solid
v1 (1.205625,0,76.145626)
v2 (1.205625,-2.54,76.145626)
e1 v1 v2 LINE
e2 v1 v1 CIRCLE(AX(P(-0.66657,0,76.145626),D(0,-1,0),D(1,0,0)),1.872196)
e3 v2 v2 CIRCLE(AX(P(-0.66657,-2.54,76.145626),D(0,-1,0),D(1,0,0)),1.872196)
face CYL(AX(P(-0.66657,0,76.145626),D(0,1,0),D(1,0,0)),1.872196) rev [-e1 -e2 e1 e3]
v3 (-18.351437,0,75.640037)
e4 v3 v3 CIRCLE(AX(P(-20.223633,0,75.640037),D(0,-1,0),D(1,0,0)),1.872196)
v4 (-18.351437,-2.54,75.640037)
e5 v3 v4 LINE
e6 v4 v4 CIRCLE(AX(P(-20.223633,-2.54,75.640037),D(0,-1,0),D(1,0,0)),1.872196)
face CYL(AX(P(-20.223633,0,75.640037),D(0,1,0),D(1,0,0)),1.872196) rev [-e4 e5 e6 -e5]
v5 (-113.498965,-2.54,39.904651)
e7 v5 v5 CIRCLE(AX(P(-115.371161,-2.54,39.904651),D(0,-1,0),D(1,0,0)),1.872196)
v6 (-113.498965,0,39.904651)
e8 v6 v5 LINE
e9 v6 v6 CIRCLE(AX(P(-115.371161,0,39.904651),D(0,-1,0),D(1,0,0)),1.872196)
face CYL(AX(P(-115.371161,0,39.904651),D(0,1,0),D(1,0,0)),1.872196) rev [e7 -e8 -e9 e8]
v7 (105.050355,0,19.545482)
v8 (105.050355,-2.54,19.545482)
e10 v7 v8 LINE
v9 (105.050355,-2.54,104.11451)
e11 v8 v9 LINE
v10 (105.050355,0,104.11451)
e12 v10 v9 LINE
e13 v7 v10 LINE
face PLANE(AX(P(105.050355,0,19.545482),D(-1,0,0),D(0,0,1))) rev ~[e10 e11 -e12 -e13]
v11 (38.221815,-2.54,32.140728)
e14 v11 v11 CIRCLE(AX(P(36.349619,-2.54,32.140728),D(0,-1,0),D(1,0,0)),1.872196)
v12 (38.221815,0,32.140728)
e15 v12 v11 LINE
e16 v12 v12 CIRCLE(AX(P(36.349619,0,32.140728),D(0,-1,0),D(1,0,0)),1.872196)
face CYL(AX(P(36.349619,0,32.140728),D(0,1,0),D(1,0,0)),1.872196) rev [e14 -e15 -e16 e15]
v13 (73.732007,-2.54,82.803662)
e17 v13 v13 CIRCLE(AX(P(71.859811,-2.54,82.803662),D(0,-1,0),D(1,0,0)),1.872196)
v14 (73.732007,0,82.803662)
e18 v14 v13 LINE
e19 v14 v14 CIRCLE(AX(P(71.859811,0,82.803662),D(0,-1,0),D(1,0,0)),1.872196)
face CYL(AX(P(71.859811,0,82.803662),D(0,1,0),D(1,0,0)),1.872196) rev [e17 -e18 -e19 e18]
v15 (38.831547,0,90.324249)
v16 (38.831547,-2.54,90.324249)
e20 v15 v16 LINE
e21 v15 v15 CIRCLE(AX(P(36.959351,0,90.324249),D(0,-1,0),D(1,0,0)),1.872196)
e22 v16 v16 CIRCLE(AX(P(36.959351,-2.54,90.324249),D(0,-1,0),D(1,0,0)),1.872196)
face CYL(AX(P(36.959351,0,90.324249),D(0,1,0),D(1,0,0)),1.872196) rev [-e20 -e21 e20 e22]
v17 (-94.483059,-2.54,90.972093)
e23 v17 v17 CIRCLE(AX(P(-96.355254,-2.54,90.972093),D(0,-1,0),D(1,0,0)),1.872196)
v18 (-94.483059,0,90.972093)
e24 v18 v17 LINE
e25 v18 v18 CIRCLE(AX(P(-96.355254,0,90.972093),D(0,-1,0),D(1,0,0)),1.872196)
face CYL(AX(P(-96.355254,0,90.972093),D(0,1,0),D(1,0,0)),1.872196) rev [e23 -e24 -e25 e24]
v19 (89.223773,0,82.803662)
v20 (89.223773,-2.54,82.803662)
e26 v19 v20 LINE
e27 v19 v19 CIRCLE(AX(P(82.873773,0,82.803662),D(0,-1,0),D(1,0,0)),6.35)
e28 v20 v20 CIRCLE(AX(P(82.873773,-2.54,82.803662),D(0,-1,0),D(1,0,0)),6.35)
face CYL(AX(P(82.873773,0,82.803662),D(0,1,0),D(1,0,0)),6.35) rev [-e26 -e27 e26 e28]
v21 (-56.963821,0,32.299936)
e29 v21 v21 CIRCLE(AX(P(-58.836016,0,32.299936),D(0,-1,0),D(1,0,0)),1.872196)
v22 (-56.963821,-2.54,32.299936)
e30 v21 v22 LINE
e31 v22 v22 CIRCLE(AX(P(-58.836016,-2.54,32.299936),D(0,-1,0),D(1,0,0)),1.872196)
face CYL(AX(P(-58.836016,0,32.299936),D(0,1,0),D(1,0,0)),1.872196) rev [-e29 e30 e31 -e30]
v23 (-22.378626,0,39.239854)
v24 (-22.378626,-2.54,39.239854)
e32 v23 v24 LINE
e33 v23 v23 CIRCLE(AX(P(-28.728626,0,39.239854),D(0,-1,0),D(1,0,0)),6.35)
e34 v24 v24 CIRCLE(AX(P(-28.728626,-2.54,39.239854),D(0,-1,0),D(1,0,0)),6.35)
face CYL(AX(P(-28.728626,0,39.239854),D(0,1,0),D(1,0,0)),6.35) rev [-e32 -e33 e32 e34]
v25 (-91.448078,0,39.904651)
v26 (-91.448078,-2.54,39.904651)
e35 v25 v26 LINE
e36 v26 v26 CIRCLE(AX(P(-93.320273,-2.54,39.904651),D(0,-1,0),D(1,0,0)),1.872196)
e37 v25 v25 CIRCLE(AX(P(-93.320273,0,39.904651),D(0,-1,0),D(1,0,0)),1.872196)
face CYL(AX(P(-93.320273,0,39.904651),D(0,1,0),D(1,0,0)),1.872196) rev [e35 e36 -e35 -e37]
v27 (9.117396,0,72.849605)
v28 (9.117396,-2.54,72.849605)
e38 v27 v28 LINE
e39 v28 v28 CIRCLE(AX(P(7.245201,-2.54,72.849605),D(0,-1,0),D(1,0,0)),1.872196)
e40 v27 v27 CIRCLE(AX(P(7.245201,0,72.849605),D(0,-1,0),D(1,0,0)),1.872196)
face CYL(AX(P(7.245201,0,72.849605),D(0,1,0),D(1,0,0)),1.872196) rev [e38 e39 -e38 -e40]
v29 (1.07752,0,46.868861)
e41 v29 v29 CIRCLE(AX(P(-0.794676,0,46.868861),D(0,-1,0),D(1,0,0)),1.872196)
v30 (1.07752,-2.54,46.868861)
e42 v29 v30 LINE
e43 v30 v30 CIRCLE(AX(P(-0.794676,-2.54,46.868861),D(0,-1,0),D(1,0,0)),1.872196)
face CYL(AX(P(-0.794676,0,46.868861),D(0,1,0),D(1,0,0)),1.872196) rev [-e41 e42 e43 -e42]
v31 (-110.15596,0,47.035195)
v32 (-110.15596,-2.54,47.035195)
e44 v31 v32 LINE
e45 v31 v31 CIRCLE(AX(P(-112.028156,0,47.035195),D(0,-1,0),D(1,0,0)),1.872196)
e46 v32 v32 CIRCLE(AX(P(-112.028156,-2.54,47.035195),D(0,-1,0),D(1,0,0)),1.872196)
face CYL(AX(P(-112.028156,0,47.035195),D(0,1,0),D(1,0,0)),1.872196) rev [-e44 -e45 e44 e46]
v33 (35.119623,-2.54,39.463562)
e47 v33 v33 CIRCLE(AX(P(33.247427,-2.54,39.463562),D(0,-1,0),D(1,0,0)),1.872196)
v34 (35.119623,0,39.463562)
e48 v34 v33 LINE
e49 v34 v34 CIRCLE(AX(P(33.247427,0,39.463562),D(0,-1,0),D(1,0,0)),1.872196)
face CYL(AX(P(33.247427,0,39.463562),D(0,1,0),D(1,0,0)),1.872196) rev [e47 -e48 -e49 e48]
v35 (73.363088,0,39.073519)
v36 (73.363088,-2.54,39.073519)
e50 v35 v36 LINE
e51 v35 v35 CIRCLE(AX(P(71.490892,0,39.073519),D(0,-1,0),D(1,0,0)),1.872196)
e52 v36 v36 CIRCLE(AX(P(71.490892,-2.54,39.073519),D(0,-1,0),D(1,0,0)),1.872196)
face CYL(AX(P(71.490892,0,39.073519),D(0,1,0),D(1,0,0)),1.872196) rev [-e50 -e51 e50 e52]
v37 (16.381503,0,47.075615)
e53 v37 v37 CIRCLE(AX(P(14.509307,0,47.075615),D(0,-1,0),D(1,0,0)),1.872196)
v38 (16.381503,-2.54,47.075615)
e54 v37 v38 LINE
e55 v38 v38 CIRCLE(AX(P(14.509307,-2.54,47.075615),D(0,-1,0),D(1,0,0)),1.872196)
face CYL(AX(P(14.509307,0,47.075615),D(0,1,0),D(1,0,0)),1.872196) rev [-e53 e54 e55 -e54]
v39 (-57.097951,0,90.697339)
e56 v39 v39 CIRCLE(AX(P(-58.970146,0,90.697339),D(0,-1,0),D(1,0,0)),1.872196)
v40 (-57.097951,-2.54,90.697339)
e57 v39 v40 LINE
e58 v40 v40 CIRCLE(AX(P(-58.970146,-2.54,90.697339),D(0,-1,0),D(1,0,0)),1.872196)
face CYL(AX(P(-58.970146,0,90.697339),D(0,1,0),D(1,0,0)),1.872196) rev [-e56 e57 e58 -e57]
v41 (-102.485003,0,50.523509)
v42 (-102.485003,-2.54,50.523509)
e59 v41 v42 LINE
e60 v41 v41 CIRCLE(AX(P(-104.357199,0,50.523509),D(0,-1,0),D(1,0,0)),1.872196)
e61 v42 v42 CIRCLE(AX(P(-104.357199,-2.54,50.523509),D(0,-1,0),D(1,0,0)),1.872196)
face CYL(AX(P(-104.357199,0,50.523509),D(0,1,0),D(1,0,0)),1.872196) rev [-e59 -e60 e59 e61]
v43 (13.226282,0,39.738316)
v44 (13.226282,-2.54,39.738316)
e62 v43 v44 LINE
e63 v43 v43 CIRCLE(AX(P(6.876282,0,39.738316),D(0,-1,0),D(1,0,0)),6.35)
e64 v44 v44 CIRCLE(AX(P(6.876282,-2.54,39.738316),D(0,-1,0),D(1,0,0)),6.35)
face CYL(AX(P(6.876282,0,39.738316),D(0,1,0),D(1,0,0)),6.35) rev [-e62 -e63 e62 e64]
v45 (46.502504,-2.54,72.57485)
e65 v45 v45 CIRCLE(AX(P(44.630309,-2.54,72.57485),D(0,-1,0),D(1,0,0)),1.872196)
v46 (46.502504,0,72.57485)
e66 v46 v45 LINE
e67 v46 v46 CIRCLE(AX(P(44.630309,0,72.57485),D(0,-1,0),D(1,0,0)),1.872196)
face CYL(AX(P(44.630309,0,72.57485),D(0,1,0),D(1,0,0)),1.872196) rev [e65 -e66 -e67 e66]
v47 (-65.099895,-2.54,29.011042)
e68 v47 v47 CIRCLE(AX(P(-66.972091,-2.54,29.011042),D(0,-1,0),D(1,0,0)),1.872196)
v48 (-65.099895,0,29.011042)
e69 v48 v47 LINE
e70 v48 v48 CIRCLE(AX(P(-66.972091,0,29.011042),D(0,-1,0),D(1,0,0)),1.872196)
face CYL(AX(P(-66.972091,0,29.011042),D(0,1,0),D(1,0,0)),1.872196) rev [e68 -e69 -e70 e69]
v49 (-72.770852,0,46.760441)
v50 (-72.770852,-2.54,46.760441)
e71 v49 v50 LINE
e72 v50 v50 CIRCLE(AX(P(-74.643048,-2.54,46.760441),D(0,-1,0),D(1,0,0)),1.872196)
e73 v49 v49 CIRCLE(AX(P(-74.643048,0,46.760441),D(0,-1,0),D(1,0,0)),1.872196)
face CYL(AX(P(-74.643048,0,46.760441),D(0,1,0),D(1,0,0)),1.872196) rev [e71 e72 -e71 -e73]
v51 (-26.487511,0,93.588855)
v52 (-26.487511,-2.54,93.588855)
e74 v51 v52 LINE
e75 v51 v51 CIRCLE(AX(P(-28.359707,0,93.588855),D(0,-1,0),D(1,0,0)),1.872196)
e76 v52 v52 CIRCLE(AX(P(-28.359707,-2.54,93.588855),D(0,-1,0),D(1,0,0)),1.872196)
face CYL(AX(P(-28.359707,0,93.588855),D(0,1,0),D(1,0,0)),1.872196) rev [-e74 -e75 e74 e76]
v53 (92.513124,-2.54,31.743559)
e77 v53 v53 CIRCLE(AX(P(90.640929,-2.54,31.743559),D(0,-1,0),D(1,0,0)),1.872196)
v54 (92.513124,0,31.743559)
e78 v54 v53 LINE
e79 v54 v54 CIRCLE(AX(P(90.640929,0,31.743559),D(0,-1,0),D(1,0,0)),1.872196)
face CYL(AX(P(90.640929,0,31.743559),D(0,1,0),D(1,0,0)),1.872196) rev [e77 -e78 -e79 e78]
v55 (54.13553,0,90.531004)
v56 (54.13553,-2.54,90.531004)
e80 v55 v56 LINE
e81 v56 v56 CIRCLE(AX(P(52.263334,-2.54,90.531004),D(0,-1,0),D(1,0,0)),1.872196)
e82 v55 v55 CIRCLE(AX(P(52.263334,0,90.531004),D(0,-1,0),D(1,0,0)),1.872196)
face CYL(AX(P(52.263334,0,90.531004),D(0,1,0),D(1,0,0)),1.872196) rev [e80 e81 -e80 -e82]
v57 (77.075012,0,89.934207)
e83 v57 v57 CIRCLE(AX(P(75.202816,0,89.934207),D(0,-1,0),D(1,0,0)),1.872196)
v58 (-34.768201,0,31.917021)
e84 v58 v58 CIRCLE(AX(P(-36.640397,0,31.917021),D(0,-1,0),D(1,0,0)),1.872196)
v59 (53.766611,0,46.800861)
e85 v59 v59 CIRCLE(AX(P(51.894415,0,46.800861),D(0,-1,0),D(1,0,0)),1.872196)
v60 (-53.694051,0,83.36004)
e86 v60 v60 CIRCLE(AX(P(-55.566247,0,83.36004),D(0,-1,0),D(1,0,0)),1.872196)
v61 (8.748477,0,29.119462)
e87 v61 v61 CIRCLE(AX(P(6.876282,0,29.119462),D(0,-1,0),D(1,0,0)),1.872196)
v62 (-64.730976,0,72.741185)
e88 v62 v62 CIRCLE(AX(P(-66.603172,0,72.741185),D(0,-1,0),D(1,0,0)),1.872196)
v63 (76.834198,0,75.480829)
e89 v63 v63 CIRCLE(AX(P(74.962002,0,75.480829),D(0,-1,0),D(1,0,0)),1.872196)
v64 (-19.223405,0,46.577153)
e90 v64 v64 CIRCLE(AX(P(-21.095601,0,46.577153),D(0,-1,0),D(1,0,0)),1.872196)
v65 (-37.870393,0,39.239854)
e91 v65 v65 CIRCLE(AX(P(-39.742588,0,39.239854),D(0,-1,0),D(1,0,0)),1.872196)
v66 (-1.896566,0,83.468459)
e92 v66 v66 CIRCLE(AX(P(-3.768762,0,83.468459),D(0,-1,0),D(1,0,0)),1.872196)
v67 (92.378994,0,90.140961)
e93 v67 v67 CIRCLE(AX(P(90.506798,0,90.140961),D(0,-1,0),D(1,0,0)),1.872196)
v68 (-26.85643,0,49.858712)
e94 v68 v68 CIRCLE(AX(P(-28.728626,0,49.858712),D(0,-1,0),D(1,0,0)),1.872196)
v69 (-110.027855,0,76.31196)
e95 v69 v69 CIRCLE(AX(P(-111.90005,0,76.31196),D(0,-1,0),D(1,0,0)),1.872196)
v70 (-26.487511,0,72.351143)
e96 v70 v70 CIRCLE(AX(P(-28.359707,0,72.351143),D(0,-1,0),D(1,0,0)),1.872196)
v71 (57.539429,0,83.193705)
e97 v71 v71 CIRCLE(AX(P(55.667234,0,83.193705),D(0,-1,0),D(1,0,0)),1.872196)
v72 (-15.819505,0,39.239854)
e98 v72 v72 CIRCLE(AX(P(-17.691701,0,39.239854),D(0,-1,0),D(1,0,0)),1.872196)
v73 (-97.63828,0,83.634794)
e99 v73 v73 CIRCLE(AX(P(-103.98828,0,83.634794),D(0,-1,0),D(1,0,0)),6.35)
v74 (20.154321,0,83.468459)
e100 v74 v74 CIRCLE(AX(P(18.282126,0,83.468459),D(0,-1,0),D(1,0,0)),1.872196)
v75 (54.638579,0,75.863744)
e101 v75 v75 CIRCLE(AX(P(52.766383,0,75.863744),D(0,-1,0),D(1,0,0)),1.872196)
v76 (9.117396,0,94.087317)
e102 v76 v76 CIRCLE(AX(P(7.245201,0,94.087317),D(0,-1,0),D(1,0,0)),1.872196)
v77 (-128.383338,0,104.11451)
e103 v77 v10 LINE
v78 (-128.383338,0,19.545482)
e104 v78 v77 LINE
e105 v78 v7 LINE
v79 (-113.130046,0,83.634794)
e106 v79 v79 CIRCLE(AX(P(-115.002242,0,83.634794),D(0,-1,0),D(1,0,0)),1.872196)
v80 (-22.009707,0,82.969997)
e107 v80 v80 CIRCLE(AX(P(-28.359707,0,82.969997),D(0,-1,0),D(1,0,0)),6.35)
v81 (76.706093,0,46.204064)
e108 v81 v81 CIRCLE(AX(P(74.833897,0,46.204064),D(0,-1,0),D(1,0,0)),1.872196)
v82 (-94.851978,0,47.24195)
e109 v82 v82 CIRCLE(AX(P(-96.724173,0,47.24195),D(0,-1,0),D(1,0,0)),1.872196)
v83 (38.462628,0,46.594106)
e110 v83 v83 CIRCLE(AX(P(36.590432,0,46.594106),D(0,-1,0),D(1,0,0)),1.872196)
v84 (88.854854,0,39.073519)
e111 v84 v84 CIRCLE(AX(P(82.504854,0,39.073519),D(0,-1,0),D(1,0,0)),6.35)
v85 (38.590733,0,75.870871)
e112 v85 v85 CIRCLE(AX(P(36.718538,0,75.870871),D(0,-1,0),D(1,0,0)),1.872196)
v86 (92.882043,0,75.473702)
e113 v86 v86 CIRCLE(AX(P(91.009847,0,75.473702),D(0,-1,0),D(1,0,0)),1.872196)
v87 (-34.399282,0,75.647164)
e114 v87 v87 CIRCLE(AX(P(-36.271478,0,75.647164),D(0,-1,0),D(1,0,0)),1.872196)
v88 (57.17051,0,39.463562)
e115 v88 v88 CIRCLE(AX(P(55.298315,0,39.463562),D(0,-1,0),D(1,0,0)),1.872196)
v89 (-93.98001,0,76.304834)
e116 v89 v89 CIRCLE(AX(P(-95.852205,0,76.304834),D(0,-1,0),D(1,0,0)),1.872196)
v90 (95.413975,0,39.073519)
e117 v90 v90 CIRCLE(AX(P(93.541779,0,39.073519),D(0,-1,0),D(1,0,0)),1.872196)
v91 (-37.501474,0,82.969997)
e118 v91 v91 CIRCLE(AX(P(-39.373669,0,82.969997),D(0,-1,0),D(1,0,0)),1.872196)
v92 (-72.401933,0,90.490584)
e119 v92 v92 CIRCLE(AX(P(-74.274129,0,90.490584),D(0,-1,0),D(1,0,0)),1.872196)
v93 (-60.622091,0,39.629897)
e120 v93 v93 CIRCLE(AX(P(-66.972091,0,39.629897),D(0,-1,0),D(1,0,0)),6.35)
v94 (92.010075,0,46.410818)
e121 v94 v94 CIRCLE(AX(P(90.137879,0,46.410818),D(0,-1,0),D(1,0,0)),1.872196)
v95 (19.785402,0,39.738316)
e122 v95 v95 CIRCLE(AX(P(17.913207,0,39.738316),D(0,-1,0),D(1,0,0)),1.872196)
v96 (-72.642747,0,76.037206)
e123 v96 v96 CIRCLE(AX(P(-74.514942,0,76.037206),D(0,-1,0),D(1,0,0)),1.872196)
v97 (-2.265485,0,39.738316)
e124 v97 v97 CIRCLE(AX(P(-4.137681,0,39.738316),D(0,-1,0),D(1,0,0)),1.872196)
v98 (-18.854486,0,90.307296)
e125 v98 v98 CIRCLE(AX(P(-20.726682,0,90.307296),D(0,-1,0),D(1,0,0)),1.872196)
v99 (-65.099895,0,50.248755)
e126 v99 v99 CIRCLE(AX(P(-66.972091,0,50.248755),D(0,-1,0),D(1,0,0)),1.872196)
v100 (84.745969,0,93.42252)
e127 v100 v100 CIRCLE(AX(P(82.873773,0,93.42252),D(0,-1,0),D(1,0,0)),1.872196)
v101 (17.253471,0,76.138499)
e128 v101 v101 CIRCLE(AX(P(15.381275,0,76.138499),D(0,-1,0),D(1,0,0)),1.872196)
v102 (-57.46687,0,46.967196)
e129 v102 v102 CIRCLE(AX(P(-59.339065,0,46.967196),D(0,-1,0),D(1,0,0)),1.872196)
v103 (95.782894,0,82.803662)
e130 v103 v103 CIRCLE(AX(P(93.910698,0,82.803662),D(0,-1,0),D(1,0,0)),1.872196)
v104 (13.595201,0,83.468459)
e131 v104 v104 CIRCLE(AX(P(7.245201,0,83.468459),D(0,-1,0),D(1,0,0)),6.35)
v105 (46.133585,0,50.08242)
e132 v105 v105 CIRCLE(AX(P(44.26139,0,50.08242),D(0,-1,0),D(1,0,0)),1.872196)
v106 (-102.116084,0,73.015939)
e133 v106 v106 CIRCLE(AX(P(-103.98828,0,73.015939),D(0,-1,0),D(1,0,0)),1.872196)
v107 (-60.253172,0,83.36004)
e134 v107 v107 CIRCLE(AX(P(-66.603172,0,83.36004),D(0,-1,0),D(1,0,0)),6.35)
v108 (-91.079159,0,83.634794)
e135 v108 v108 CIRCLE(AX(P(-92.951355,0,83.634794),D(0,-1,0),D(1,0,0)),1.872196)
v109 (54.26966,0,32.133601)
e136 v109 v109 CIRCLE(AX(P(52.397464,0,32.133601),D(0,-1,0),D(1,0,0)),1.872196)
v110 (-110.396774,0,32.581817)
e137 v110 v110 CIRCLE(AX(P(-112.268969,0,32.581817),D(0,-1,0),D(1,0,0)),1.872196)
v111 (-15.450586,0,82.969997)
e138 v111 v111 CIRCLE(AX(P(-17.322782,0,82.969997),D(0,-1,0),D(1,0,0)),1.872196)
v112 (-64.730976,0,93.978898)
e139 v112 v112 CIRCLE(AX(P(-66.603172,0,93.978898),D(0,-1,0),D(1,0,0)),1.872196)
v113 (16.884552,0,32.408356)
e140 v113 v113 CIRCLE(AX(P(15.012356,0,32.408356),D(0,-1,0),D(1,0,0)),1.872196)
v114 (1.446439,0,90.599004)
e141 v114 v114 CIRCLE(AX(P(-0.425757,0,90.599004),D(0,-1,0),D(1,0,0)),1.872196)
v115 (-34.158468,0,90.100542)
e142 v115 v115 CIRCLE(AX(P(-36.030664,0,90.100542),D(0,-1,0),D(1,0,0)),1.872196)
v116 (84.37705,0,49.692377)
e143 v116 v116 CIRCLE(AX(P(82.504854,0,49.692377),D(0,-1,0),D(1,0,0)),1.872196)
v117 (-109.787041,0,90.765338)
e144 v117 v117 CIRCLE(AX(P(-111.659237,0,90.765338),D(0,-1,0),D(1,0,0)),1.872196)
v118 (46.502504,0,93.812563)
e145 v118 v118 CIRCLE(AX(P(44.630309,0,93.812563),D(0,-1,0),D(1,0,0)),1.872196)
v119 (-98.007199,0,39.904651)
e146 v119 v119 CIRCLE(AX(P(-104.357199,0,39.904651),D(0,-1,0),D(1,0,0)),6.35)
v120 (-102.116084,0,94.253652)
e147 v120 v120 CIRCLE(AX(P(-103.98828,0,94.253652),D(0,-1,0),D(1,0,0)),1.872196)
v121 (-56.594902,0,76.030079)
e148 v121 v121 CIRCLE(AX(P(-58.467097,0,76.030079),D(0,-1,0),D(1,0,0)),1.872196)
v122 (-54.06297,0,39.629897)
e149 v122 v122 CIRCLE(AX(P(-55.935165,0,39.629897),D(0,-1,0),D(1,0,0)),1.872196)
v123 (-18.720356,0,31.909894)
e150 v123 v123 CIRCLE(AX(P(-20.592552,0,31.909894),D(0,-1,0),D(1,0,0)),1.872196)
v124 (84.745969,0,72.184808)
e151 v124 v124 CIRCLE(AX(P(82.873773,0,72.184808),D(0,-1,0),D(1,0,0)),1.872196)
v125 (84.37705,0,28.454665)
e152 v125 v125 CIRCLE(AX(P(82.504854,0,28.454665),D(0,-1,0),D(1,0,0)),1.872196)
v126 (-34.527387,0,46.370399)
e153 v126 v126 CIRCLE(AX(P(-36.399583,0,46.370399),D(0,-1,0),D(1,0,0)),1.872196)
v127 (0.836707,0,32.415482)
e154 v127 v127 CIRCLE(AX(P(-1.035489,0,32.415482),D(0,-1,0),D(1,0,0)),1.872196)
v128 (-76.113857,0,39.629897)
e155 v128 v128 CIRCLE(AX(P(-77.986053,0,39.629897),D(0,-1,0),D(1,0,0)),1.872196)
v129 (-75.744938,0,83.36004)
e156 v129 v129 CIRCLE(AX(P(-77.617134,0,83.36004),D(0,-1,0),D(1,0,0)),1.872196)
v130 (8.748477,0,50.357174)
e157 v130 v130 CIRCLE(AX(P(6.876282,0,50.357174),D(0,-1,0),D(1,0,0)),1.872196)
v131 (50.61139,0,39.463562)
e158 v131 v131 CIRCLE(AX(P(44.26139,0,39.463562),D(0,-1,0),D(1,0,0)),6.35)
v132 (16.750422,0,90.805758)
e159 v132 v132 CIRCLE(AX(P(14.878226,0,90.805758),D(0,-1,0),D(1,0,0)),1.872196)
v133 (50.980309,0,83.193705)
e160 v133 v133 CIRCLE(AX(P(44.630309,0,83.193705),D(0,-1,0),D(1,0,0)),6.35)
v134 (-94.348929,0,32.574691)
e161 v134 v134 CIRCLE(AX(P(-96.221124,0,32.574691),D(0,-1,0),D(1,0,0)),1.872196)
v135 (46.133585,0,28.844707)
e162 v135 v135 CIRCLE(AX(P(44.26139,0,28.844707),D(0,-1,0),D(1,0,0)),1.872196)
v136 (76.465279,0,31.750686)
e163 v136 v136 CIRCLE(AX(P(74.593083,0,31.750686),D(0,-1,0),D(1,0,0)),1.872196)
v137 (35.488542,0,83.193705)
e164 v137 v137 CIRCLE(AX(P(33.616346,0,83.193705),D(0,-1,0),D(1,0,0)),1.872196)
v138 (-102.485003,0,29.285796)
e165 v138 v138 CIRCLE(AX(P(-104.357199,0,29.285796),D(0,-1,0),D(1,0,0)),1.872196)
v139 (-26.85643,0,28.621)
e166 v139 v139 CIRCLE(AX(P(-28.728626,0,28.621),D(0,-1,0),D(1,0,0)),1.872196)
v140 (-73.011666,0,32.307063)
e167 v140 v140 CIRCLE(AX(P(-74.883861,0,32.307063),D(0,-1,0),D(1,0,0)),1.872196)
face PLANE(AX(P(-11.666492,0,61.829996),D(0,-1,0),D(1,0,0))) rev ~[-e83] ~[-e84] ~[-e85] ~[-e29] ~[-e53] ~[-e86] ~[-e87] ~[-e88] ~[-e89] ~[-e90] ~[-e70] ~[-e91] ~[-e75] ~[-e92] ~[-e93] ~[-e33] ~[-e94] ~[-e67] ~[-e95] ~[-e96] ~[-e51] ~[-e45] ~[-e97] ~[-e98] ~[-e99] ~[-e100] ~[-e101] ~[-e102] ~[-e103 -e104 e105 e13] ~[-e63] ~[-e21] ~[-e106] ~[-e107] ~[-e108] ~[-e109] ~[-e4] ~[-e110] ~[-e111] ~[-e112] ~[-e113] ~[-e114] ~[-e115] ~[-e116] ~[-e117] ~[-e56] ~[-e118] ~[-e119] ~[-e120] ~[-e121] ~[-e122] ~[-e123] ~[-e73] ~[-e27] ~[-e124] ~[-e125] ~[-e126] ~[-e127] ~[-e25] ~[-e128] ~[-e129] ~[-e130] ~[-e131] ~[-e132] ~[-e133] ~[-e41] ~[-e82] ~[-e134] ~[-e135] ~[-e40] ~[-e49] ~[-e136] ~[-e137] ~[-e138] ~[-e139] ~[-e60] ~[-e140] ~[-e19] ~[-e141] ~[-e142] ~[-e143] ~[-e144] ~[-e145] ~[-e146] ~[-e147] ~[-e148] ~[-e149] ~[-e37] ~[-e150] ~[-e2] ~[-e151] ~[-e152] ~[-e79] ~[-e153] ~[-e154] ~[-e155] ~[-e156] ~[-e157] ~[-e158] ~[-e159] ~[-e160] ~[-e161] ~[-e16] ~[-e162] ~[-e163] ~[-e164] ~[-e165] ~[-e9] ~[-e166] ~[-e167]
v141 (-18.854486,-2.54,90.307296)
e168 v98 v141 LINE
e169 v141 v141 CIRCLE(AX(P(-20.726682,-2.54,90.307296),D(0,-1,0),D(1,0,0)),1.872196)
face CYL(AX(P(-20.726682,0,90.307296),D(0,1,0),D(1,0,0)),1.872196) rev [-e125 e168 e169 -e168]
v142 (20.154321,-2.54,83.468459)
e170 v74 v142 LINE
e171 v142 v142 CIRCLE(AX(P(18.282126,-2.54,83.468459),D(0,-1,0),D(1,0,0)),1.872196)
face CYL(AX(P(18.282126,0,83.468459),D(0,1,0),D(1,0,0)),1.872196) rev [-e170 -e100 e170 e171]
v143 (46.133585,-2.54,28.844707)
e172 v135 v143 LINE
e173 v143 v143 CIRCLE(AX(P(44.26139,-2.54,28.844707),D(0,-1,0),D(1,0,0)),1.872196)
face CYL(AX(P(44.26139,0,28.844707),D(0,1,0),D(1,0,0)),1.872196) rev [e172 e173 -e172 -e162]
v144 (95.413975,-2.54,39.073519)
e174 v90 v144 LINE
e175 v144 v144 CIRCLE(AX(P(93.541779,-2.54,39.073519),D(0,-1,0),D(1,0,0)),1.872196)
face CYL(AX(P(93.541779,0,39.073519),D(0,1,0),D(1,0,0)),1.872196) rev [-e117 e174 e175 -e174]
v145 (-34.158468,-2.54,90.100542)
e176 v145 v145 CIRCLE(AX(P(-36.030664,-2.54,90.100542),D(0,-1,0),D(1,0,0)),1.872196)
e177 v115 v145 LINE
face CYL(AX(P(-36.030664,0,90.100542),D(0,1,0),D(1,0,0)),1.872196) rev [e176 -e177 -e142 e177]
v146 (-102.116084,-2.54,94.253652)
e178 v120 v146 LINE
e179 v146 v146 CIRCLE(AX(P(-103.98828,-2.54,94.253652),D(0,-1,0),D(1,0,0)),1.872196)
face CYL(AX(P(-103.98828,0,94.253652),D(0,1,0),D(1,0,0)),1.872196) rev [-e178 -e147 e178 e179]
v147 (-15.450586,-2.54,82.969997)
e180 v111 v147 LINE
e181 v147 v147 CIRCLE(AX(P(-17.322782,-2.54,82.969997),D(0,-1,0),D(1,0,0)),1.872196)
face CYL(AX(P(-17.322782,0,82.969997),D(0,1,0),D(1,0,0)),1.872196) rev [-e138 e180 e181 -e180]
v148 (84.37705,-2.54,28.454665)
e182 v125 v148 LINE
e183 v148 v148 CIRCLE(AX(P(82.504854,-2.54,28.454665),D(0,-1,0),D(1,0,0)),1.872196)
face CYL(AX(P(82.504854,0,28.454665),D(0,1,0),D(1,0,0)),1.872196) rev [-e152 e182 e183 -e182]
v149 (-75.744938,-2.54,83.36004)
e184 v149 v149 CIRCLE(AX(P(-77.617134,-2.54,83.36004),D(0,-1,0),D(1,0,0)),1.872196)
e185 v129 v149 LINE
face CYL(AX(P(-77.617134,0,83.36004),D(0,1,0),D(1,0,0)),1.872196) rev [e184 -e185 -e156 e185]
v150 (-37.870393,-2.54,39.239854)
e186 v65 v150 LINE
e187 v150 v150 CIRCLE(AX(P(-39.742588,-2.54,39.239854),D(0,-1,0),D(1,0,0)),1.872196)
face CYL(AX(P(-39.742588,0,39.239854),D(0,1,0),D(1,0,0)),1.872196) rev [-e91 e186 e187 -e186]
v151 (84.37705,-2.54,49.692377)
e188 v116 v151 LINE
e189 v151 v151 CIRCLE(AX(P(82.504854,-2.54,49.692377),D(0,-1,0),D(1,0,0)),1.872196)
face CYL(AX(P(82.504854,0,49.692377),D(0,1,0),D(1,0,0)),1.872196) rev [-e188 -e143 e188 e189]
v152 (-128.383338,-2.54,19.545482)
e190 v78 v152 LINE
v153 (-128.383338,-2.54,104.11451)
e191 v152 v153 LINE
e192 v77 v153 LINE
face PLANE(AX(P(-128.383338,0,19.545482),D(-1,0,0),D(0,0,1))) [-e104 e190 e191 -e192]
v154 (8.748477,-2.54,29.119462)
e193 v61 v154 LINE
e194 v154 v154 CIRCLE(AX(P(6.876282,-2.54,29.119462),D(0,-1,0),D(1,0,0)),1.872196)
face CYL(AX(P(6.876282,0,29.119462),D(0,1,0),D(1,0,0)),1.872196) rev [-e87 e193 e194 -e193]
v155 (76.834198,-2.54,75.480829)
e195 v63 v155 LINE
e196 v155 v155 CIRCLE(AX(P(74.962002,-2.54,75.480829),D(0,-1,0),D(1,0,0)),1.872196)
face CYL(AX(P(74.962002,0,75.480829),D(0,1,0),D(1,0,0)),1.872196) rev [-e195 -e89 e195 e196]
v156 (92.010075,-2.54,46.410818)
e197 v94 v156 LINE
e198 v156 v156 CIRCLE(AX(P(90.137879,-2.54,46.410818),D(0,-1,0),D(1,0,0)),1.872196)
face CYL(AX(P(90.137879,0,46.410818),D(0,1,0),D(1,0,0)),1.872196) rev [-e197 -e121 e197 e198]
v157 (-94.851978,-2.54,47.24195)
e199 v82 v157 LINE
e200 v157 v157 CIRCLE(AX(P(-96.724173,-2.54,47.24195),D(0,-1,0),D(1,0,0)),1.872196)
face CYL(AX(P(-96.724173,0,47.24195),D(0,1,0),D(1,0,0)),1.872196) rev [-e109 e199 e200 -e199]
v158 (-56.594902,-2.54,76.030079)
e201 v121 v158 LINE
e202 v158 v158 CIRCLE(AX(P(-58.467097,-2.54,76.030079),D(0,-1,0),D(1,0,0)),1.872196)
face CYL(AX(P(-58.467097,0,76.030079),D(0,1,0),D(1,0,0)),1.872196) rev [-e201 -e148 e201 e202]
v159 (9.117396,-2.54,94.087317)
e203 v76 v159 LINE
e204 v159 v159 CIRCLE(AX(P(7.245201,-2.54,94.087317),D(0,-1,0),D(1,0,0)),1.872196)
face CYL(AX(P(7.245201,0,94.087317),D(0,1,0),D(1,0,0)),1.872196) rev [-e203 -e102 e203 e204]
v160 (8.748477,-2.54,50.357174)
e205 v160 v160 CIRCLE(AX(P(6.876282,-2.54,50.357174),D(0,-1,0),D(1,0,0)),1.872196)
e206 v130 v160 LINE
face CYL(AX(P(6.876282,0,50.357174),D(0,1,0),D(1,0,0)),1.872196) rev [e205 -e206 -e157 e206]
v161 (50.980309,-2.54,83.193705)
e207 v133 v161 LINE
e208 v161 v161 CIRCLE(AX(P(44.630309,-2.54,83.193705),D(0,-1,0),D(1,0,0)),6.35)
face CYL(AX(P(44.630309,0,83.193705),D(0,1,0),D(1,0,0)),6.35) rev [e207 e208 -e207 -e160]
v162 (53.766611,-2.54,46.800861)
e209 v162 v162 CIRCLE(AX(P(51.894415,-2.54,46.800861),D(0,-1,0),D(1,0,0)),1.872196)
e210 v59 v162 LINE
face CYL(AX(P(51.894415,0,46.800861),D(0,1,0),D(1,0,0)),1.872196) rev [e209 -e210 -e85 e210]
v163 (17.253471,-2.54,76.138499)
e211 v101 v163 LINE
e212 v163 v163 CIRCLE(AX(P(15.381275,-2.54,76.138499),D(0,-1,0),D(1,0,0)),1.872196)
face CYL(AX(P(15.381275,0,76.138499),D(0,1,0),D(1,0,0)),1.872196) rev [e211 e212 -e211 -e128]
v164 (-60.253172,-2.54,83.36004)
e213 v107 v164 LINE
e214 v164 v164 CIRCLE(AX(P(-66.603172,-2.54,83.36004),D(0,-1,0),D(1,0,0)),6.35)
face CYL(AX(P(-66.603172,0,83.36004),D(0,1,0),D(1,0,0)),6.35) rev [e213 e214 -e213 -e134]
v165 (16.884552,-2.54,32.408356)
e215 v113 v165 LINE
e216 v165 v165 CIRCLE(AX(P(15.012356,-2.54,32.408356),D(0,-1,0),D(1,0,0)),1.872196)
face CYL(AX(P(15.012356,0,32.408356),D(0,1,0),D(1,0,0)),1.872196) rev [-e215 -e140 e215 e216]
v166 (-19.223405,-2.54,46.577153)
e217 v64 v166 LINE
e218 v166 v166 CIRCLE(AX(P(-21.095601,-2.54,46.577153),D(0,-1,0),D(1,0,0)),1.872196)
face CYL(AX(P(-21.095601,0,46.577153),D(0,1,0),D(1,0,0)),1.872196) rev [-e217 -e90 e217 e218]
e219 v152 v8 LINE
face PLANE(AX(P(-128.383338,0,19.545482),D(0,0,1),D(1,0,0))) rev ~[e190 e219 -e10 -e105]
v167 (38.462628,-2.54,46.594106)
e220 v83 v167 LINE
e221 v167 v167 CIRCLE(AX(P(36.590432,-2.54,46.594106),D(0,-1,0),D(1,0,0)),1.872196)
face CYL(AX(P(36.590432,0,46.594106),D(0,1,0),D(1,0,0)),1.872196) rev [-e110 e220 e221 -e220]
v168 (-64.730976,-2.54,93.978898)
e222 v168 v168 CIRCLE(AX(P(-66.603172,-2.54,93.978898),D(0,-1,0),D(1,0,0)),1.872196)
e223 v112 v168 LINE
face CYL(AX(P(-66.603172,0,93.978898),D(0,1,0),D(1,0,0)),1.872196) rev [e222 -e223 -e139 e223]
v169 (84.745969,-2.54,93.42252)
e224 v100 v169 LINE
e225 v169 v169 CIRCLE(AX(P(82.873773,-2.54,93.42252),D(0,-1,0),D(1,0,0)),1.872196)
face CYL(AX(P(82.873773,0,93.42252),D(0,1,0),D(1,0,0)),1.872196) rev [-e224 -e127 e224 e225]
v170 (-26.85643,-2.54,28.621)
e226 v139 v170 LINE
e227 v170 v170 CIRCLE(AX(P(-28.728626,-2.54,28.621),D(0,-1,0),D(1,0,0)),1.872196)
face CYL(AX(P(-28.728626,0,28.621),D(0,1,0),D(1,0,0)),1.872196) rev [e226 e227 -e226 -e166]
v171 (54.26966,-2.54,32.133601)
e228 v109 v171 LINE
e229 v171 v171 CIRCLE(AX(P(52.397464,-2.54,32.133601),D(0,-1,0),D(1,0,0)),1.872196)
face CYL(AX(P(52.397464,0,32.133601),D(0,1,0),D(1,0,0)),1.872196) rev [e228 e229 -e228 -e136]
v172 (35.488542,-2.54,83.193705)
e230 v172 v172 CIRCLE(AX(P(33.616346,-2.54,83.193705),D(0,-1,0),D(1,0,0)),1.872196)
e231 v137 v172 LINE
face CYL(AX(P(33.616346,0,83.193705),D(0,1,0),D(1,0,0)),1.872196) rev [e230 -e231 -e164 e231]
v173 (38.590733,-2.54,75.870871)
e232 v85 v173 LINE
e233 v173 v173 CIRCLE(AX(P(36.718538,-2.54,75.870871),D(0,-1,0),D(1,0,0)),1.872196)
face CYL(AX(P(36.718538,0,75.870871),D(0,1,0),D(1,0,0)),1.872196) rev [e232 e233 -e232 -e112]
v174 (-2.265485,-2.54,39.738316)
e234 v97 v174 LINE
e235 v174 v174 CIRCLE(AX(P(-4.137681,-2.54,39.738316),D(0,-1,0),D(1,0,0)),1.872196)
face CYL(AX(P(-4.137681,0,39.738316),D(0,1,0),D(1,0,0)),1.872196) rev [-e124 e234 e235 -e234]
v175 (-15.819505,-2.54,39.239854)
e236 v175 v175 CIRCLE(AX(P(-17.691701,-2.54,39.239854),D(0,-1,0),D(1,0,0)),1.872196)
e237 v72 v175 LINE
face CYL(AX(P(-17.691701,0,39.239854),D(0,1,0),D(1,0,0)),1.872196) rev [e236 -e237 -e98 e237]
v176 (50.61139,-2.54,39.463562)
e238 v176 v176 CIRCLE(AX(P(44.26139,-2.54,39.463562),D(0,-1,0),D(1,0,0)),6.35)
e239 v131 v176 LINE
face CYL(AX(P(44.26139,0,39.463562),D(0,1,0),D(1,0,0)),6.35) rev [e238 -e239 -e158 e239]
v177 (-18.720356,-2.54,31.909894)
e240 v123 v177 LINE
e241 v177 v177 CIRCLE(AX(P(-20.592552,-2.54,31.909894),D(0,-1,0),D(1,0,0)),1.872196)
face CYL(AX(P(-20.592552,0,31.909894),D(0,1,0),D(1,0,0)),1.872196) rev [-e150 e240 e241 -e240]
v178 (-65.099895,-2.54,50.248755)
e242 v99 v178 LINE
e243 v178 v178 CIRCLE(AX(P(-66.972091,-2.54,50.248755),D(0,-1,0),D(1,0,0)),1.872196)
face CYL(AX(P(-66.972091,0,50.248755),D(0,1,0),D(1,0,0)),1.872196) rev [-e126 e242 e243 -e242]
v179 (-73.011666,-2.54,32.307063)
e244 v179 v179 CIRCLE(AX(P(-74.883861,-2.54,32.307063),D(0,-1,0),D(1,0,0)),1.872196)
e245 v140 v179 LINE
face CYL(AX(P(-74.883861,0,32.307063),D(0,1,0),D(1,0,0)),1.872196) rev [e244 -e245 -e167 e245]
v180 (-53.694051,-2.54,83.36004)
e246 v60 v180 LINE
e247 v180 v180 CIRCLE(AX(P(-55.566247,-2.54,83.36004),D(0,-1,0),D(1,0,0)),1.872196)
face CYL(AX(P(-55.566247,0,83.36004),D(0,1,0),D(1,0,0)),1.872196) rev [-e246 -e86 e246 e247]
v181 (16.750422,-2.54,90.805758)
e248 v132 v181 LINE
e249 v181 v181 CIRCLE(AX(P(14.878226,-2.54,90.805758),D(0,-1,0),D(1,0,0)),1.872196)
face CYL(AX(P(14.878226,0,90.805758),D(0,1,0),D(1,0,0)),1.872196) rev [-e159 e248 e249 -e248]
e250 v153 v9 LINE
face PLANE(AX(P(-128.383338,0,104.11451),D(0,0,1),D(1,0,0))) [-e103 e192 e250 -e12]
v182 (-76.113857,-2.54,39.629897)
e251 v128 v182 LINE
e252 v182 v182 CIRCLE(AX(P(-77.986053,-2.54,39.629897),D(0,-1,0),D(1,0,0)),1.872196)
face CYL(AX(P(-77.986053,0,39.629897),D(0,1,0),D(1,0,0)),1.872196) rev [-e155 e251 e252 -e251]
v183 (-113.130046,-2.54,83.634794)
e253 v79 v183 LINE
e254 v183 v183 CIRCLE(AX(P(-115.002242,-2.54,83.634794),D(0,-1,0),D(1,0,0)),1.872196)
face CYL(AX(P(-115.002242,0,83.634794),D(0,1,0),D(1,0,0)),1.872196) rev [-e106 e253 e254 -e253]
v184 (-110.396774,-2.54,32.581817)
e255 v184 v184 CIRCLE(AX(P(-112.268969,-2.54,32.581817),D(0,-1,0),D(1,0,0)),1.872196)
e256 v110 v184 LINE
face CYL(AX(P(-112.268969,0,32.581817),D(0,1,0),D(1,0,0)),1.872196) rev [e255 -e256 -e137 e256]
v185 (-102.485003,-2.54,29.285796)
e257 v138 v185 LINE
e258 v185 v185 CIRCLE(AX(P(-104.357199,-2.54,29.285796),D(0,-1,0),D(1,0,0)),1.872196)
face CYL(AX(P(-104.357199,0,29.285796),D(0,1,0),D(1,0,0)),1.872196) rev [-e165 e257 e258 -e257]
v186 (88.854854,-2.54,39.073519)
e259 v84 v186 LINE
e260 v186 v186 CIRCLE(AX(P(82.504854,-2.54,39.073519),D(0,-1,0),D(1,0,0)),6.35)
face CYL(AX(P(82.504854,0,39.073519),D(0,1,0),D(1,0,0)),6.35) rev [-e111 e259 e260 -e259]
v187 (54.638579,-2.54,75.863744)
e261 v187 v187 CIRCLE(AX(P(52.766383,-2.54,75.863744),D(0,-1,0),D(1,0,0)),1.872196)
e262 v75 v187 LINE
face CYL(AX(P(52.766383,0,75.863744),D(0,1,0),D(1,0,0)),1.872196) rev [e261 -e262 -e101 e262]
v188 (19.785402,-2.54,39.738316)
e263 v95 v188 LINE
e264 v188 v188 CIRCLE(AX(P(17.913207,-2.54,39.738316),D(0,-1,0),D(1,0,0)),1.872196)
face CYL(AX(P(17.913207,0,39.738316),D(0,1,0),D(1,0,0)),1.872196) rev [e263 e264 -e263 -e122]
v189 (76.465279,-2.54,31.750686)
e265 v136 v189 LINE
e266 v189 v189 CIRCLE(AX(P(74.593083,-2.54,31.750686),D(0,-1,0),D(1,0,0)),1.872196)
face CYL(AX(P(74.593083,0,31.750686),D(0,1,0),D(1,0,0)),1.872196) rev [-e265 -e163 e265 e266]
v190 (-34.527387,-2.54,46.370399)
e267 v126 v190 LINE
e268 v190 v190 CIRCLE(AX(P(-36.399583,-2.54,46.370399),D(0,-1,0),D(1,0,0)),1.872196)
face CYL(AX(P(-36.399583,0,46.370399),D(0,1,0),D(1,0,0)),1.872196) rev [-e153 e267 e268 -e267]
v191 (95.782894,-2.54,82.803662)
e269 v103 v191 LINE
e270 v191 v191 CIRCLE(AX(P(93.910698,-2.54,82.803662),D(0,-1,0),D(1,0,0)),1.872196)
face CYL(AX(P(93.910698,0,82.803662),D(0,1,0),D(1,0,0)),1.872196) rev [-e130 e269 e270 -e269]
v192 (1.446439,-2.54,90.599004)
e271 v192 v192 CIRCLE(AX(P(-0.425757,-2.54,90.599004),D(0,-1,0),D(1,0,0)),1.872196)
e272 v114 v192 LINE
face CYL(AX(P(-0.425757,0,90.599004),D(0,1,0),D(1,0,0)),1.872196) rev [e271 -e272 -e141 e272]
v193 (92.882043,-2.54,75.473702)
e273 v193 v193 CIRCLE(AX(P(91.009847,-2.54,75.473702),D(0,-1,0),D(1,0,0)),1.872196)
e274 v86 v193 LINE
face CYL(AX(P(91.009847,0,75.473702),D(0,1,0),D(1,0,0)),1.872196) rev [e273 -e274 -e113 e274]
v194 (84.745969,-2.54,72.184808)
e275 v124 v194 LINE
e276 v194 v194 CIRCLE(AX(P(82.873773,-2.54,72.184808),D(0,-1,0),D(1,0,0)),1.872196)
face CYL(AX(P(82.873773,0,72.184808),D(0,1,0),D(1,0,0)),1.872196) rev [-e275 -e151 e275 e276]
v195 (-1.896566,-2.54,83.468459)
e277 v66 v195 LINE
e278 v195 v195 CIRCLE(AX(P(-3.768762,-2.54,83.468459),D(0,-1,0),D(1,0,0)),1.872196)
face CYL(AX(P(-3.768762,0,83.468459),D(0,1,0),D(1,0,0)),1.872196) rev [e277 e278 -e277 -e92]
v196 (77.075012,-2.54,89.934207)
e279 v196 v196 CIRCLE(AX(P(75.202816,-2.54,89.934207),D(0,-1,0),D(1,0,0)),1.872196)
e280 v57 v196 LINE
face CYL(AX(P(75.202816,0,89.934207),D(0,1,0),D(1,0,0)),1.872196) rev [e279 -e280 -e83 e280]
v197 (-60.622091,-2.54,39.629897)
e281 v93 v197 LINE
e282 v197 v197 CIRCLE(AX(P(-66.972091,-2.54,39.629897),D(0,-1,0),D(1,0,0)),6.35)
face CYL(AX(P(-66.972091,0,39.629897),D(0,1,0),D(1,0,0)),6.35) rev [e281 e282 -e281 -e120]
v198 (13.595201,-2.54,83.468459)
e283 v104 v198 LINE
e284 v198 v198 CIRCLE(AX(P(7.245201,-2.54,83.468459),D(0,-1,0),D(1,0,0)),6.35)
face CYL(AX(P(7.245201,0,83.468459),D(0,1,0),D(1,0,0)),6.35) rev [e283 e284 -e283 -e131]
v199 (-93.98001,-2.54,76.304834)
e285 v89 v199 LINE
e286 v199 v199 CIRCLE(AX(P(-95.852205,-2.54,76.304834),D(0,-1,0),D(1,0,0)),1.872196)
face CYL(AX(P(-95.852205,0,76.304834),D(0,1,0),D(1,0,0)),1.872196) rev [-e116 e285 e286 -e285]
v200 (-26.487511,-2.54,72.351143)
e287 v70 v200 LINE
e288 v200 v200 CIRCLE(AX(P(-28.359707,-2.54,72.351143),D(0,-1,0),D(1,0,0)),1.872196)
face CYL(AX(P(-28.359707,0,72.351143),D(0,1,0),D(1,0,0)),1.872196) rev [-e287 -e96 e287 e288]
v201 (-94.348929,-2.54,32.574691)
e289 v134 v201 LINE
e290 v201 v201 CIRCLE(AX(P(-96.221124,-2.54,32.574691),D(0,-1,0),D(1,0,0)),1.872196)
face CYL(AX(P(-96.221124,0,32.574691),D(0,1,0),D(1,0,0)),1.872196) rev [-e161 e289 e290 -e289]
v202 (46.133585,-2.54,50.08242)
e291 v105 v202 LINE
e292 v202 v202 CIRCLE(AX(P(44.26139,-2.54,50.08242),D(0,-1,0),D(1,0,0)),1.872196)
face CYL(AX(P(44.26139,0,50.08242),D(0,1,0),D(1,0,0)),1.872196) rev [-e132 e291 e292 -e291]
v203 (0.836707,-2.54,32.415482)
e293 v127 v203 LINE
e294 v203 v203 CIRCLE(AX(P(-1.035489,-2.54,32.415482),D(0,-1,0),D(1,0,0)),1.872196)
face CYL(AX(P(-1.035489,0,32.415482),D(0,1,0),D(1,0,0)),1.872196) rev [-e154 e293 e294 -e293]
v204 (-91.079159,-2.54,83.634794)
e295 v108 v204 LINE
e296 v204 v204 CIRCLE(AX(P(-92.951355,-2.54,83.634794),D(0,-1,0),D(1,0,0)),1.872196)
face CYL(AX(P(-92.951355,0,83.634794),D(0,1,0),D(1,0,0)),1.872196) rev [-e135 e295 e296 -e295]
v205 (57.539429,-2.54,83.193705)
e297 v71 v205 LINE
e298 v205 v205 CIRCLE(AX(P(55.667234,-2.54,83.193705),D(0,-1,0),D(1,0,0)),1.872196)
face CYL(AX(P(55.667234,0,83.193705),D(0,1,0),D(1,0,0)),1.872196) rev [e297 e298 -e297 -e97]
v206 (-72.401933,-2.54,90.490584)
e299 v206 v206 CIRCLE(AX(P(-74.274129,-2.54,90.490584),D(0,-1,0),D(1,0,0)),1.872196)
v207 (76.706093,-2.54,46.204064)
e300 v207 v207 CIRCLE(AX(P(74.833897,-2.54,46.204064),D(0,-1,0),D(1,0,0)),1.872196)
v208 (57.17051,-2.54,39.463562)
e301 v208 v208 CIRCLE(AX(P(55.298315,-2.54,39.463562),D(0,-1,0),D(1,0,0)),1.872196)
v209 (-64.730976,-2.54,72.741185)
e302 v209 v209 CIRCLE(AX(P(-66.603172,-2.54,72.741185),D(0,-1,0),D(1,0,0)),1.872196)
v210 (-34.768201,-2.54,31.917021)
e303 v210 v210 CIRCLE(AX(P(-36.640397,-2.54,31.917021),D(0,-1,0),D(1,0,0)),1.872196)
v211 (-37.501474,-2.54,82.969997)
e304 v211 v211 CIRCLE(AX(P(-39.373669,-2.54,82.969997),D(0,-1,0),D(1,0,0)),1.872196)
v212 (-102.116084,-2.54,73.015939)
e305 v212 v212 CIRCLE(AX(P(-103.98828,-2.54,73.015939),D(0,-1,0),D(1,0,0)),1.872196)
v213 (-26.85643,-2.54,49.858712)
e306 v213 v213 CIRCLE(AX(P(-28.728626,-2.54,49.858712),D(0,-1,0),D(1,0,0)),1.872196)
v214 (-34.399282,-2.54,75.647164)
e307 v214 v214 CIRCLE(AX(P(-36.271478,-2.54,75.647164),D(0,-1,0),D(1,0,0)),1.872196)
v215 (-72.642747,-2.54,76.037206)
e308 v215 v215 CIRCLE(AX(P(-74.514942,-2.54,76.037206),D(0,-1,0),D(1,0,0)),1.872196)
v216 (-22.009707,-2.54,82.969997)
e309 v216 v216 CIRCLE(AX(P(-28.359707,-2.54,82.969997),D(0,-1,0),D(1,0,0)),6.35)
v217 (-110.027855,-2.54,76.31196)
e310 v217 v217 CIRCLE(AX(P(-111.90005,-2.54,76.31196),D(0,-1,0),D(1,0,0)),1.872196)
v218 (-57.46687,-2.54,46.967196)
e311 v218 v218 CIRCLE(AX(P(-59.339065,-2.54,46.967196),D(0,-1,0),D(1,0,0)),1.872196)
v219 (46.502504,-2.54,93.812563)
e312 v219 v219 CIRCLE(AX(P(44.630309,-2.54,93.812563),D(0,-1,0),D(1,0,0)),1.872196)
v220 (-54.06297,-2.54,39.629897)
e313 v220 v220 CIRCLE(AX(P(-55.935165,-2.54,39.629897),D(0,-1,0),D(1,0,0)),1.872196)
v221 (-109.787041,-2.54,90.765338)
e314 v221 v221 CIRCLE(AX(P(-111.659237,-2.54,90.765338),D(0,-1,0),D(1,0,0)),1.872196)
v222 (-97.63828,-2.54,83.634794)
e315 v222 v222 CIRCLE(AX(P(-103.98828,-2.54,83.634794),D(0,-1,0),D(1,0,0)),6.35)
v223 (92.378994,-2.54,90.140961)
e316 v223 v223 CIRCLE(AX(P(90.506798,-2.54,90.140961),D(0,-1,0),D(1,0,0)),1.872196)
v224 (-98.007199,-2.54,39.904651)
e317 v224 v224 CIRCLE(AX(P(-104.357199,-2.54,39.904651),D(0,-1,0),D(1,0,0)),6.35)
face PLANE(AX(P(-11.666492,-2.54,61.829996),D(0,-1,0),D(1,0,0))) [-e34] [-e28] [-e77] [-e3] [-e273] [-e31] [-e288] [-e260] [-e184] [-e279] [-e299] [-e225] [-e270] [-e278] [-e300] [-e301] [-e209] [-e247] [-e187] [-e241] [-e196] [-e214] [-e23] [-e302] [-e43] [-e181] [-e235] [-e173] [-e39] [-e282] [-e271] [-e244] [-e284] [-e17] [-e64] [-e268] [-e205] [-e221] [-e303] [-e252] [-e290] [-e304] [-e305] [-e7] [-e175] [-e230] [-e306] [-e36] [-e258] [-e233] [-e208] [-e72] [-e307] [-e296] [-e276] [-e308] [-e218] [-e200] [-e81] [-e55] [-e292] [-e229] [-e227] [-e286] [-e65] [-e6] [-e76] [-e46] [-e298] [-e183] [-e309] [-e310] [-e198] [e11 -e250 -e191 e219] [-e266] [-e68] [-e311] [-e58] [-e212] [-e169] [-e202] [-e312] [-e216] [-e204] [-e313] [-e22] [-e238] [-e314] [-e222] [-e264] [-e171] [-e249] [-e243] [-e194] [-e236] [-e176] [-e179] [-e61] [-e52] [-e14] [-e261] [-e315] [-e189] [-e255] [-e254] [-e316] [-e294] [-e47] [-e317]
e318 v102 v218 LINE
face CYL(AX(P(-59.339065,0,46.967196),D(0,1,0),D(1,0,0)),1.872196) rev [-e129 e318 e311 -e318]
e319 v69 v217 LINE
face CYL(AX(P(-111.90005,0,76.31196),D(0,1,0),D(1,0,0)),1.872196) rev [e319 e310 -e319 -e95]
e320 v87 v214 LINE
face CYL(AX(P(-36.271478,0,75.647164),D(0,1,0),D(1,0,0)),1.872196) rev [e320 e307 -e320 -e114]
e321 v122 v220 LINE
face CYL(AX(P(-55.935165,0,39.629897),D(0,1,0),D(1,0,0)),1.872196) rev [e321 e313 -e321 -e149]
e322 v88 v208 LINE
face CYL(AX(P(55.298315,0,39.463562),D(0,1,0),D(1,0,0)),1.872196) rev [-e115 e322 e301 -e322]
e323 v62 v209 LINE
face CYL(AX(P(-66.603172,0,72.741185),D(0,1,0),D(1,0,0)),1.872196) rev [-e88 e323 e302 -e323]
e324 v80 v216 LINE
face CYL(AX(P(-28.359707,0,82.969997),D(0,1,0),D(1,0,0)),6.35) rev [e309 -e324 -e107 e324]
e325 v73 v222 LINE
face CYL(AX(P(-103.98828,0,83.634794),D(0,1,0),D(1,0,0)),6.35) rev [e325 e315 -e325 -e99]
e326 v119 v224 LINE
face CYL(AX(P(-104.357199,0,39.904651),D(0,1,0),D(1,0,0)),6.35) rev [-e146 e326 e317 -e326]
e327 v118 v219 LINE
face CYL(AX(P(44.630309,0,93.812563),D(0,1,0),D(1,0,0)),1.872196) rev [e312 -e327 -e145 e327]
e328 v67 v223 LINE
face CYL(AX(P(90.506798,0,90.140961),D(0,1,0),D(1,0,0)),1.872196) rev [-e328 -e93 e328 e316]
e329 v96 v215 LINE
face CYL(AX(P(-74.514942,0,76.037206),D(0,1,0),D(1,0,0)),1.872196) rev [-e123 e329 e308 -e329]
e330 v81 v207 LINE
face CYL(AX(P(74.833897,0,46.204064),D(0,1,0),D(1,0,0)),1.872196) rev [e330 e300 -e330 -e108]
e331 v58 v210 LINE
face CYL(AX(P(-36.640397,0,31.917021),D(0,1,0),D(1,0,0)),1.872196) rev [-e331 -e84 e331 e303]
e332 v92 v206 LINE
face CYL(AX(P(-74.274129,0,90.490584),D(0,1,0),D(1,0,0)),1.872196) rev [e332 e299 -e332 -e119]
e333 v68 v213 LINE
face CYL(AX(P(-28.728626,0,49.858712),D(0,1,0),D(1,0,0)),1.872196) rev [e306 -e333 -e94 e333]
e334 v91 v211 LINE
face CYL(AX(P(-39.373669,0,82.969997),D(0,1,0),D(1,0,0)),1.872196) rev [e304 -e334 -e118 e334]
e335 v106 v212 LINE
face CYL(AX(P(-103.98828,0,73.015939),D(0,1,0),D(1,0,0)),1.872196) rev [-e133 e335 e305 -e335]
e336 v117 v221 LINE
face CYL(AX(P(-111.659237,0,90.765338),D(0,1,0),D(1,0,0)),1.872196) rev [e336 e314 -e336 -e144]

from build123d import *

# Parameters (mm, degrees)
F0_W     = 233.4336936474
F0_H     = 84.5690276474
F0_R     = 1.8721957215
F0_R_2   = 6.35
F1_DEPTH = 2.54


# Not quite as in the source:
# - a feature names something its author has since deleted; it is built from what else it names


with BuildPart() as f1:
    # F0 (on Front) → F1 (new body)
    with BuildSketch(Plane.XZ):
        with Locations((-11.6664916277, 61.8299962953)):
            Rectangle(F0_W, F0_H)
        with Locations((-104.3571985153, 29.2857964082)):
            Circle(F0_R, mode=Mode.SUBTRACT)
        with Locations((-112.2689694166, 32.5818173587)):
            Circle(F0_R, mode=Mode.SUBTRACT)
        with Locations((-115.3711608437, 39.9046507223)):
            Circle(F0_R, mode=Mode.SUBTRACT)
        with Locations((-104.3571985153, 39.9046507223)):
            Circle(F0_R_2, mode=Mode.SUBTRACT)
        with Locations((-96.2211242398, 32.574690507)):
            Circle(F0_R, mode=Mode.SUBTRACT)
        with Locations((-74.883861413, 32.3070631458)):
            Circle(F0_R, mode=Mode.SUBTRACT)
        with Locations((-93.3202734975, 39.9046507223)):
            Circle(F0_R, mode=Mode.SUBTRACT)
        with Locations((-77.9860528401, 39.6298965093)):
            Circle(F0_R, mode=Mode.SUBTRACT)
        with Locations((-66.9720905117, 29.0110421952)):
            Circle(F0_R, mode=Mode.SUBTRACT)
        with Locations((-28.7286259285, 28.620999728)):
            Circle(F0_R, mode=Mode.SUBTRACT)
        with Locations((-58.8360162362, 32.299936294)):
            Circle(F0_R, mode=Mode.SUBTRACT)
        with Locations((-66.9720905117, 39.6298965093)):
            Circle(F0_R_2, mode=Mode.SUBTRACT)
        with Locations((-55.9351654939, 39.6298965093)):
            Circle(F0_R, mode=Mode.SUBTRACT)
        with Locations((-36.6403968299, 31.9170206785)):
            Circle(F0_R, mode=Mode.SUBTRACT)
        with Locations((-20.5925516531, 31.9098938268)):
            Circle(F0_R, mode=Mode.SUBTRACT)
        with Locations((-39.742588257, 39.2398540421)):
            Circle(F0_R, mode=Mode.SUBTRACT)
        with Locations((-28.7286259285, 39.2398540421)):
            Circle(F0_R_2, mode=Mode.SUBTRACT)
        with Locations((-17.6917009107, 39.2398540421)):
            Circle(F0_R, mode=Mode.SUBTRACT)
        with Locations((-112.0281557075, 47.0351953909)):
            Circle(F0_R, mode=Mode.SUBTRACT)
        with Locations((-104.3571985153, 50.5235087617)):
            Circle(F0_R, mode=Mode.SUBTRACT)
        with Locations((-96.7241733432, 47.2419499663)):
            Circle(F0_R, mode=Mode.SUBTRACT)
        with Locations((-74.6430477039, 46.7604411779)):
            Circle(F0_R, mode=Mode.SUBTRACT)
        with Locations((-59.3390653396, 46.9671957533)):
            Circle(F0_R, mode=Mode.SUBTRACT)
        with Locations((-66.9720905117, 50.2487545487)):
            Circle(F0_R, mode=Mode.SUBTRACT)
        with Locations((-36.3995831207, 46.3703987107)):
            Circle(F0_R, mode=Mode.SUBTRACT)
        with Locations((-28.7286259285, 49.8587120814)):
            Circle(F0_R, mode=Mode.SUBTRACT)
        with Locations((-21.0956007565, 46.5771532861)):
            Circle(F0_R, mode=Mode.SUBTRACT)
        with Locations((6.8762816883, 29.1194615197)):
            Circle(F0_R, mode=Mode.SUBTRACT)
        with Locations((44.2613896919, 28.8447073068)):
            Circle(F0_R, mode=Mode.SUBTRACT)
        with Locations((-1.035489213, 32.4154824703)):
            Circle(F0_R, mode=Mode.SUBTRACT)
        with Locations((15.0123559638, 32.4083556185)):
            Circle(F0_R, mode=Mode.SUBTRACT)
        with Locations((-4.1376806401, 39.7383158338)):
            Circle(F0_R, mode=Mode.SUBTRACT)
        with Locations((6.8762816883, 39.7383158338)):
            Circle(F0_R_2, mode=Mode.SUBTRACT)
        with Locations((36.3496187906, 32.1407282573)):
            Circle(F0_R, mode=Mode.SUBTRACT)
        with Locations((17.9132067062, 39.7383158338)):
            Circle(F0_R, mode=Mode.SUBTRACT)
        with Locations((33.2474273635, 39.4635616208)):
            Circle(F0_R, mode=Mode.SUBTRACT)
        with Locations((44.2613896919, 39.4635616208)):
            Circle(F0_R_2, mode=Mode.SUBTRACT)
        with Locations((82.5048542751, 28.4546648395)):
            Circle(F0_R, mode=Mode.SUBTRACT)
        with Locations((52.3974639674, 32.1336014056)):
            Circle(F0_R, mode=Mode.SUBTRACT)
        with Locations((74.5930833738, 31.7506857901)):
            Circle(F0_R, mode=Mode.SUBTRACT)
        with Locations((55.2983147098, 39.4635616208)):
            Circle(F0_R, mode=Mode.SUBTRACT)
        with Locations((71.4908919467, 39.0735191536)):
            Circle(F0_R, mode=Mode.SUBTRACT)
        with Locations((90.6409285506, 31.7435589383)):
            Circle(F0_R, mode=Mode.SUBTRACT)
        with Locations((82.5048542751, 39.0735191536)):
            Circle(F0_R_2, mode=Mode.SUBTRACT)
        with Locations((93.5417792929, 39.0735191536)):
            Circle(F0_R, mode=Mode.SUBTRACT)
        with Locations((-0.7946755039, 46.8688605024)):
            Circle(F0_R, mode=Mode.SUBTRACT)
        with Locations((14.5093068604, 47.0756150778)):
            Circle(F0_R, mode=Mode.SUBTRACT)
        with Locations((6.8762816883, 50.3571738732)):
            Circle(F0_R, mode=Mode.SUBTRACT)
        with Locations((36.5904324997, 46.5941062895)):
            Circle(F0_R, mode=Mode.SUBTRACT)
        with Locations((44.2613896919, 50.0824196602)):
            Circle(F0_R, mode=Mode.SUBTRACT)
        with Locations((51.894414864, 46.8008608649)):
            Circle(F0_R, mode=Mode.SUBTRACT)
        with Locations((74.8338970829, 46.2040638222)):
            Circle(F0_R, mode=Mode.SUBTRACT)
        with Locations((90.1378794472, 46.4108183976)):
            Circle(F0_R, mode=Mode.SUBTRACT)
        with Locations((82.5048542751, 49.692377193)):
            Circle(F0_R, mode=Mode.SUBTRACT)
        with Locations((-103.9882795885, 73.0159394443)):
            Circle(F0_R, mode=Mode.SUBTRACT)
        with Locations((-111.9000504898, 76.3119603949)):
            Circle(F0_R, mode=Mode.SUBTRACT)
        with Locations((-95.852205313, 76.3048335431)):
            Circle(F0_R, mode=Mode.SUBTRACT)
        with Locations((-74.5149424862, 76.0372061819)):
            Circle(F0_R, mode=Mode.SUBTRACT)
        with Locations((-28.3597070018, 72.3511427641)):
            Circle(F0_R, mode=Mode.SUBTRACT)
        with Locations((-66.6031715849, 72.7411852313)):
            Circle(F0_R, mode=Mode.SUBTRACT)
        with Locations((-58.4670973094, 76.0300793301)):
            Circle(F0_R, mode=Mode.SUBTRACT)
        with Locations((-36.2714779031, 75.6471637146)):
            Circle(F0_R, mode=Mode.SUBTRACT)
        with Locations((-20.2236327263, 75.6400368629)):
            Circle(F0_R, mode=Mode.SUBTRACT)
        with Locations((-39.3736693302, 82.9699970782)):
            Circle(F0_R, mode=Mode.SUBTRACT)
        with Locations((-28.3597070018, 82.9699970782)):
            Circle(F0_R_2, mode=Mode.SUBTRACT)
        with Locations((-17.3227819839, 82.9699970782)):
            Circle(F0_R, mode=Mode.SUBTRACT)
        with Locations((-115.002241917, 83.6347937584)):
            Circle(F0_R, mode=Mode.SUBTRACT)
        with Locations((-103.9882795885, 83.6347937584)):
            Circle(F0_R_2, mode=Mode.SUBTRACT)
        with Locations((-111.6592367807, 90.765338427)):
            Circle(F0_R, mode=Mode.SUBTRACT)
        with Locations((-92.9513545707, 83.6347937584)):
            Circle(F0_R, mode=Mode.SUBTRACT)
        with Locations((-77.6171339134, 83.3600395454)):
            Circle(F0_R, mode=Mode.SUBTRACT)
        with Locations((-96.3552544164, 90.9720930024)):
            Circle(F0_R, mode=Mode.SUBTRACT)
        with Locations((-74.2741287771, 90.490584214)):
            Circle(F0_R, mode=Mode.SUBTRACT)
        with Locations((-103.9882795885, 94.2536517978)):
            Circle(F0_R, mode=Mode.SUBTRACT)
        with Locations((-66.6031715849, 83.3600395454)):
            Circle(F0_R_2, mode=Mode.SUBTRACT)
        with Locations((-55.5662465671, 83.3600395454)):
            Circle(F0_R, mode=Mode.SUBTRACT)
        with Locations((-58.9701464129, 90.6973387894)):
            Circle(F0_R, mode=Mode.SUBTRACT)
        with Locations((-36.030664194, 90.1005417468)):
            Circle(F0_R, mode=Mode.SUBTRACT)
        with Locations((-20.7266818297, 90.3072963222)):
            Circle(F0_R, mode=Mode.SUBTRACT)
        with Locations((-66.6031715849, 93.9788975848)):
            Circle(F0_R, mode=Mode.SUBTRACT)
        with Locations((-28.3597070018, 93.5888551176)):
            Circle(F0_R, mode=Mode.SUBTRACT)
        with Locations((-0.6665702862, 76.1456255064)):
            Circle(F0_R, mode=Mode.SUBTRACT)
        with Locations((7.2452006151, 72.8496045558)):
            Circle(F0_R, mode=Mode.SUBTRACT)
        with Locations((15.3812748906, 76.1384986547)):
            Circle(F0_R, mode=Mode.SUBTRACT)
        with Locations((44.6303086187, 72.5748503429)):
            Circle(F0_R, mode=Mode.SUBTRACT)
        with Locations((36.7185377174, 75.8708712934)):
            Circle(F0_R, mode=Mode.SUBTRACT)
        with Locations((82.8737732019, 72.1848078756)):
            Circle(F0_R, mode=Mode.SUBTRACT)
        with Locations((52.7663828942, 75.8637444417)):
            Circle(F0_R, mode=Mode.SUBTRACT)
        with Locations((74.9620023005, 75.4808288262)):
            Circle(F0_R, mode=Mode.SUBTRACT)
        with Locations((71.8598108734, 82.8036621897)):
            Circle(F0_R, mode=Mode.SUBTRACT)
        with Locations((91.0098474773, 75.4737019744)):
            Circle(F0_R, mode=Mode.SUBTRACT)
        with Locations((82.8737732019, 82.8036621897)):
            Circle(F0_R_2, mode=Mode.SUBTRACT)
        with Locations((93.9106982197, 82.8036621897)):
            Circle(F0_R, mode=Mode.SUBTRACT)
        with Locations((-3.7687617133, 83.4684588699)):
            Circle(F0_R, mode=Mode.SUBTRACT)
        with Locations((7.2452006151, 83.4684588699)):
            Circle(F0_R_2, mode=Mode.SUBTRACT)
        with Locations((-0.4257565771, 90.5990035386)):
            Circle(F0_R, mode=Mode.SUBTRACT)
        with Locations((14.8782257872, 90.805758114)):
            Circle(F0_R, mode=Mode.SUBTRACT)
        with Locations((18.2821256329, 83.4684588699)):
            Circle(F0_R, mode=Mode.SUBTRACT)
        with Locations((33.6163462903, 83.193704657)):
            Circle(F0_R, mode=Mode.SUBTRACT)
        with Locations((44.6303086187, 83.193704657)):
            Circle(F0_R_2, mode=Mode.SUBTRACT)
        with Locations((36.9593514265, 90.3242493256)):
            Circle(F0_R, mode=Mode.SUBTRACT)
        with Locations((7.2452006151, 94.0873169093)):
            Circle(F0_R, mode=Mode.SUBTRACT)
        with Locations((44.6303086187, 93.8125626963)):
            Circle(F0_R, mode=Mode.SUBTRACT)
        with Locations((55.6672336365, 83.193704657)):
            Circle(F0_R, mode=Mode.SUBTRACT)
        with Locations((52.2633337908, 90.531003901)):
            Circle(F0_R, mode=Mode.SUBTRACT)
        with Locations((75.2028160097, 89.9342068583)):
            Circle(F0_R, mode=Mode.SUBTRACT)
        with Locations((82.8737732019, 93.4225202291)):
            Circle(F0_R, mode=Mode.SUBTRACT)
        with Locations((90.5067983739, 90.1409614337)):
            Circle(F0_R, mode=Mode.SUBTRACT)
    extrude(amount=F1_DEPTH)


solid = f1.part
